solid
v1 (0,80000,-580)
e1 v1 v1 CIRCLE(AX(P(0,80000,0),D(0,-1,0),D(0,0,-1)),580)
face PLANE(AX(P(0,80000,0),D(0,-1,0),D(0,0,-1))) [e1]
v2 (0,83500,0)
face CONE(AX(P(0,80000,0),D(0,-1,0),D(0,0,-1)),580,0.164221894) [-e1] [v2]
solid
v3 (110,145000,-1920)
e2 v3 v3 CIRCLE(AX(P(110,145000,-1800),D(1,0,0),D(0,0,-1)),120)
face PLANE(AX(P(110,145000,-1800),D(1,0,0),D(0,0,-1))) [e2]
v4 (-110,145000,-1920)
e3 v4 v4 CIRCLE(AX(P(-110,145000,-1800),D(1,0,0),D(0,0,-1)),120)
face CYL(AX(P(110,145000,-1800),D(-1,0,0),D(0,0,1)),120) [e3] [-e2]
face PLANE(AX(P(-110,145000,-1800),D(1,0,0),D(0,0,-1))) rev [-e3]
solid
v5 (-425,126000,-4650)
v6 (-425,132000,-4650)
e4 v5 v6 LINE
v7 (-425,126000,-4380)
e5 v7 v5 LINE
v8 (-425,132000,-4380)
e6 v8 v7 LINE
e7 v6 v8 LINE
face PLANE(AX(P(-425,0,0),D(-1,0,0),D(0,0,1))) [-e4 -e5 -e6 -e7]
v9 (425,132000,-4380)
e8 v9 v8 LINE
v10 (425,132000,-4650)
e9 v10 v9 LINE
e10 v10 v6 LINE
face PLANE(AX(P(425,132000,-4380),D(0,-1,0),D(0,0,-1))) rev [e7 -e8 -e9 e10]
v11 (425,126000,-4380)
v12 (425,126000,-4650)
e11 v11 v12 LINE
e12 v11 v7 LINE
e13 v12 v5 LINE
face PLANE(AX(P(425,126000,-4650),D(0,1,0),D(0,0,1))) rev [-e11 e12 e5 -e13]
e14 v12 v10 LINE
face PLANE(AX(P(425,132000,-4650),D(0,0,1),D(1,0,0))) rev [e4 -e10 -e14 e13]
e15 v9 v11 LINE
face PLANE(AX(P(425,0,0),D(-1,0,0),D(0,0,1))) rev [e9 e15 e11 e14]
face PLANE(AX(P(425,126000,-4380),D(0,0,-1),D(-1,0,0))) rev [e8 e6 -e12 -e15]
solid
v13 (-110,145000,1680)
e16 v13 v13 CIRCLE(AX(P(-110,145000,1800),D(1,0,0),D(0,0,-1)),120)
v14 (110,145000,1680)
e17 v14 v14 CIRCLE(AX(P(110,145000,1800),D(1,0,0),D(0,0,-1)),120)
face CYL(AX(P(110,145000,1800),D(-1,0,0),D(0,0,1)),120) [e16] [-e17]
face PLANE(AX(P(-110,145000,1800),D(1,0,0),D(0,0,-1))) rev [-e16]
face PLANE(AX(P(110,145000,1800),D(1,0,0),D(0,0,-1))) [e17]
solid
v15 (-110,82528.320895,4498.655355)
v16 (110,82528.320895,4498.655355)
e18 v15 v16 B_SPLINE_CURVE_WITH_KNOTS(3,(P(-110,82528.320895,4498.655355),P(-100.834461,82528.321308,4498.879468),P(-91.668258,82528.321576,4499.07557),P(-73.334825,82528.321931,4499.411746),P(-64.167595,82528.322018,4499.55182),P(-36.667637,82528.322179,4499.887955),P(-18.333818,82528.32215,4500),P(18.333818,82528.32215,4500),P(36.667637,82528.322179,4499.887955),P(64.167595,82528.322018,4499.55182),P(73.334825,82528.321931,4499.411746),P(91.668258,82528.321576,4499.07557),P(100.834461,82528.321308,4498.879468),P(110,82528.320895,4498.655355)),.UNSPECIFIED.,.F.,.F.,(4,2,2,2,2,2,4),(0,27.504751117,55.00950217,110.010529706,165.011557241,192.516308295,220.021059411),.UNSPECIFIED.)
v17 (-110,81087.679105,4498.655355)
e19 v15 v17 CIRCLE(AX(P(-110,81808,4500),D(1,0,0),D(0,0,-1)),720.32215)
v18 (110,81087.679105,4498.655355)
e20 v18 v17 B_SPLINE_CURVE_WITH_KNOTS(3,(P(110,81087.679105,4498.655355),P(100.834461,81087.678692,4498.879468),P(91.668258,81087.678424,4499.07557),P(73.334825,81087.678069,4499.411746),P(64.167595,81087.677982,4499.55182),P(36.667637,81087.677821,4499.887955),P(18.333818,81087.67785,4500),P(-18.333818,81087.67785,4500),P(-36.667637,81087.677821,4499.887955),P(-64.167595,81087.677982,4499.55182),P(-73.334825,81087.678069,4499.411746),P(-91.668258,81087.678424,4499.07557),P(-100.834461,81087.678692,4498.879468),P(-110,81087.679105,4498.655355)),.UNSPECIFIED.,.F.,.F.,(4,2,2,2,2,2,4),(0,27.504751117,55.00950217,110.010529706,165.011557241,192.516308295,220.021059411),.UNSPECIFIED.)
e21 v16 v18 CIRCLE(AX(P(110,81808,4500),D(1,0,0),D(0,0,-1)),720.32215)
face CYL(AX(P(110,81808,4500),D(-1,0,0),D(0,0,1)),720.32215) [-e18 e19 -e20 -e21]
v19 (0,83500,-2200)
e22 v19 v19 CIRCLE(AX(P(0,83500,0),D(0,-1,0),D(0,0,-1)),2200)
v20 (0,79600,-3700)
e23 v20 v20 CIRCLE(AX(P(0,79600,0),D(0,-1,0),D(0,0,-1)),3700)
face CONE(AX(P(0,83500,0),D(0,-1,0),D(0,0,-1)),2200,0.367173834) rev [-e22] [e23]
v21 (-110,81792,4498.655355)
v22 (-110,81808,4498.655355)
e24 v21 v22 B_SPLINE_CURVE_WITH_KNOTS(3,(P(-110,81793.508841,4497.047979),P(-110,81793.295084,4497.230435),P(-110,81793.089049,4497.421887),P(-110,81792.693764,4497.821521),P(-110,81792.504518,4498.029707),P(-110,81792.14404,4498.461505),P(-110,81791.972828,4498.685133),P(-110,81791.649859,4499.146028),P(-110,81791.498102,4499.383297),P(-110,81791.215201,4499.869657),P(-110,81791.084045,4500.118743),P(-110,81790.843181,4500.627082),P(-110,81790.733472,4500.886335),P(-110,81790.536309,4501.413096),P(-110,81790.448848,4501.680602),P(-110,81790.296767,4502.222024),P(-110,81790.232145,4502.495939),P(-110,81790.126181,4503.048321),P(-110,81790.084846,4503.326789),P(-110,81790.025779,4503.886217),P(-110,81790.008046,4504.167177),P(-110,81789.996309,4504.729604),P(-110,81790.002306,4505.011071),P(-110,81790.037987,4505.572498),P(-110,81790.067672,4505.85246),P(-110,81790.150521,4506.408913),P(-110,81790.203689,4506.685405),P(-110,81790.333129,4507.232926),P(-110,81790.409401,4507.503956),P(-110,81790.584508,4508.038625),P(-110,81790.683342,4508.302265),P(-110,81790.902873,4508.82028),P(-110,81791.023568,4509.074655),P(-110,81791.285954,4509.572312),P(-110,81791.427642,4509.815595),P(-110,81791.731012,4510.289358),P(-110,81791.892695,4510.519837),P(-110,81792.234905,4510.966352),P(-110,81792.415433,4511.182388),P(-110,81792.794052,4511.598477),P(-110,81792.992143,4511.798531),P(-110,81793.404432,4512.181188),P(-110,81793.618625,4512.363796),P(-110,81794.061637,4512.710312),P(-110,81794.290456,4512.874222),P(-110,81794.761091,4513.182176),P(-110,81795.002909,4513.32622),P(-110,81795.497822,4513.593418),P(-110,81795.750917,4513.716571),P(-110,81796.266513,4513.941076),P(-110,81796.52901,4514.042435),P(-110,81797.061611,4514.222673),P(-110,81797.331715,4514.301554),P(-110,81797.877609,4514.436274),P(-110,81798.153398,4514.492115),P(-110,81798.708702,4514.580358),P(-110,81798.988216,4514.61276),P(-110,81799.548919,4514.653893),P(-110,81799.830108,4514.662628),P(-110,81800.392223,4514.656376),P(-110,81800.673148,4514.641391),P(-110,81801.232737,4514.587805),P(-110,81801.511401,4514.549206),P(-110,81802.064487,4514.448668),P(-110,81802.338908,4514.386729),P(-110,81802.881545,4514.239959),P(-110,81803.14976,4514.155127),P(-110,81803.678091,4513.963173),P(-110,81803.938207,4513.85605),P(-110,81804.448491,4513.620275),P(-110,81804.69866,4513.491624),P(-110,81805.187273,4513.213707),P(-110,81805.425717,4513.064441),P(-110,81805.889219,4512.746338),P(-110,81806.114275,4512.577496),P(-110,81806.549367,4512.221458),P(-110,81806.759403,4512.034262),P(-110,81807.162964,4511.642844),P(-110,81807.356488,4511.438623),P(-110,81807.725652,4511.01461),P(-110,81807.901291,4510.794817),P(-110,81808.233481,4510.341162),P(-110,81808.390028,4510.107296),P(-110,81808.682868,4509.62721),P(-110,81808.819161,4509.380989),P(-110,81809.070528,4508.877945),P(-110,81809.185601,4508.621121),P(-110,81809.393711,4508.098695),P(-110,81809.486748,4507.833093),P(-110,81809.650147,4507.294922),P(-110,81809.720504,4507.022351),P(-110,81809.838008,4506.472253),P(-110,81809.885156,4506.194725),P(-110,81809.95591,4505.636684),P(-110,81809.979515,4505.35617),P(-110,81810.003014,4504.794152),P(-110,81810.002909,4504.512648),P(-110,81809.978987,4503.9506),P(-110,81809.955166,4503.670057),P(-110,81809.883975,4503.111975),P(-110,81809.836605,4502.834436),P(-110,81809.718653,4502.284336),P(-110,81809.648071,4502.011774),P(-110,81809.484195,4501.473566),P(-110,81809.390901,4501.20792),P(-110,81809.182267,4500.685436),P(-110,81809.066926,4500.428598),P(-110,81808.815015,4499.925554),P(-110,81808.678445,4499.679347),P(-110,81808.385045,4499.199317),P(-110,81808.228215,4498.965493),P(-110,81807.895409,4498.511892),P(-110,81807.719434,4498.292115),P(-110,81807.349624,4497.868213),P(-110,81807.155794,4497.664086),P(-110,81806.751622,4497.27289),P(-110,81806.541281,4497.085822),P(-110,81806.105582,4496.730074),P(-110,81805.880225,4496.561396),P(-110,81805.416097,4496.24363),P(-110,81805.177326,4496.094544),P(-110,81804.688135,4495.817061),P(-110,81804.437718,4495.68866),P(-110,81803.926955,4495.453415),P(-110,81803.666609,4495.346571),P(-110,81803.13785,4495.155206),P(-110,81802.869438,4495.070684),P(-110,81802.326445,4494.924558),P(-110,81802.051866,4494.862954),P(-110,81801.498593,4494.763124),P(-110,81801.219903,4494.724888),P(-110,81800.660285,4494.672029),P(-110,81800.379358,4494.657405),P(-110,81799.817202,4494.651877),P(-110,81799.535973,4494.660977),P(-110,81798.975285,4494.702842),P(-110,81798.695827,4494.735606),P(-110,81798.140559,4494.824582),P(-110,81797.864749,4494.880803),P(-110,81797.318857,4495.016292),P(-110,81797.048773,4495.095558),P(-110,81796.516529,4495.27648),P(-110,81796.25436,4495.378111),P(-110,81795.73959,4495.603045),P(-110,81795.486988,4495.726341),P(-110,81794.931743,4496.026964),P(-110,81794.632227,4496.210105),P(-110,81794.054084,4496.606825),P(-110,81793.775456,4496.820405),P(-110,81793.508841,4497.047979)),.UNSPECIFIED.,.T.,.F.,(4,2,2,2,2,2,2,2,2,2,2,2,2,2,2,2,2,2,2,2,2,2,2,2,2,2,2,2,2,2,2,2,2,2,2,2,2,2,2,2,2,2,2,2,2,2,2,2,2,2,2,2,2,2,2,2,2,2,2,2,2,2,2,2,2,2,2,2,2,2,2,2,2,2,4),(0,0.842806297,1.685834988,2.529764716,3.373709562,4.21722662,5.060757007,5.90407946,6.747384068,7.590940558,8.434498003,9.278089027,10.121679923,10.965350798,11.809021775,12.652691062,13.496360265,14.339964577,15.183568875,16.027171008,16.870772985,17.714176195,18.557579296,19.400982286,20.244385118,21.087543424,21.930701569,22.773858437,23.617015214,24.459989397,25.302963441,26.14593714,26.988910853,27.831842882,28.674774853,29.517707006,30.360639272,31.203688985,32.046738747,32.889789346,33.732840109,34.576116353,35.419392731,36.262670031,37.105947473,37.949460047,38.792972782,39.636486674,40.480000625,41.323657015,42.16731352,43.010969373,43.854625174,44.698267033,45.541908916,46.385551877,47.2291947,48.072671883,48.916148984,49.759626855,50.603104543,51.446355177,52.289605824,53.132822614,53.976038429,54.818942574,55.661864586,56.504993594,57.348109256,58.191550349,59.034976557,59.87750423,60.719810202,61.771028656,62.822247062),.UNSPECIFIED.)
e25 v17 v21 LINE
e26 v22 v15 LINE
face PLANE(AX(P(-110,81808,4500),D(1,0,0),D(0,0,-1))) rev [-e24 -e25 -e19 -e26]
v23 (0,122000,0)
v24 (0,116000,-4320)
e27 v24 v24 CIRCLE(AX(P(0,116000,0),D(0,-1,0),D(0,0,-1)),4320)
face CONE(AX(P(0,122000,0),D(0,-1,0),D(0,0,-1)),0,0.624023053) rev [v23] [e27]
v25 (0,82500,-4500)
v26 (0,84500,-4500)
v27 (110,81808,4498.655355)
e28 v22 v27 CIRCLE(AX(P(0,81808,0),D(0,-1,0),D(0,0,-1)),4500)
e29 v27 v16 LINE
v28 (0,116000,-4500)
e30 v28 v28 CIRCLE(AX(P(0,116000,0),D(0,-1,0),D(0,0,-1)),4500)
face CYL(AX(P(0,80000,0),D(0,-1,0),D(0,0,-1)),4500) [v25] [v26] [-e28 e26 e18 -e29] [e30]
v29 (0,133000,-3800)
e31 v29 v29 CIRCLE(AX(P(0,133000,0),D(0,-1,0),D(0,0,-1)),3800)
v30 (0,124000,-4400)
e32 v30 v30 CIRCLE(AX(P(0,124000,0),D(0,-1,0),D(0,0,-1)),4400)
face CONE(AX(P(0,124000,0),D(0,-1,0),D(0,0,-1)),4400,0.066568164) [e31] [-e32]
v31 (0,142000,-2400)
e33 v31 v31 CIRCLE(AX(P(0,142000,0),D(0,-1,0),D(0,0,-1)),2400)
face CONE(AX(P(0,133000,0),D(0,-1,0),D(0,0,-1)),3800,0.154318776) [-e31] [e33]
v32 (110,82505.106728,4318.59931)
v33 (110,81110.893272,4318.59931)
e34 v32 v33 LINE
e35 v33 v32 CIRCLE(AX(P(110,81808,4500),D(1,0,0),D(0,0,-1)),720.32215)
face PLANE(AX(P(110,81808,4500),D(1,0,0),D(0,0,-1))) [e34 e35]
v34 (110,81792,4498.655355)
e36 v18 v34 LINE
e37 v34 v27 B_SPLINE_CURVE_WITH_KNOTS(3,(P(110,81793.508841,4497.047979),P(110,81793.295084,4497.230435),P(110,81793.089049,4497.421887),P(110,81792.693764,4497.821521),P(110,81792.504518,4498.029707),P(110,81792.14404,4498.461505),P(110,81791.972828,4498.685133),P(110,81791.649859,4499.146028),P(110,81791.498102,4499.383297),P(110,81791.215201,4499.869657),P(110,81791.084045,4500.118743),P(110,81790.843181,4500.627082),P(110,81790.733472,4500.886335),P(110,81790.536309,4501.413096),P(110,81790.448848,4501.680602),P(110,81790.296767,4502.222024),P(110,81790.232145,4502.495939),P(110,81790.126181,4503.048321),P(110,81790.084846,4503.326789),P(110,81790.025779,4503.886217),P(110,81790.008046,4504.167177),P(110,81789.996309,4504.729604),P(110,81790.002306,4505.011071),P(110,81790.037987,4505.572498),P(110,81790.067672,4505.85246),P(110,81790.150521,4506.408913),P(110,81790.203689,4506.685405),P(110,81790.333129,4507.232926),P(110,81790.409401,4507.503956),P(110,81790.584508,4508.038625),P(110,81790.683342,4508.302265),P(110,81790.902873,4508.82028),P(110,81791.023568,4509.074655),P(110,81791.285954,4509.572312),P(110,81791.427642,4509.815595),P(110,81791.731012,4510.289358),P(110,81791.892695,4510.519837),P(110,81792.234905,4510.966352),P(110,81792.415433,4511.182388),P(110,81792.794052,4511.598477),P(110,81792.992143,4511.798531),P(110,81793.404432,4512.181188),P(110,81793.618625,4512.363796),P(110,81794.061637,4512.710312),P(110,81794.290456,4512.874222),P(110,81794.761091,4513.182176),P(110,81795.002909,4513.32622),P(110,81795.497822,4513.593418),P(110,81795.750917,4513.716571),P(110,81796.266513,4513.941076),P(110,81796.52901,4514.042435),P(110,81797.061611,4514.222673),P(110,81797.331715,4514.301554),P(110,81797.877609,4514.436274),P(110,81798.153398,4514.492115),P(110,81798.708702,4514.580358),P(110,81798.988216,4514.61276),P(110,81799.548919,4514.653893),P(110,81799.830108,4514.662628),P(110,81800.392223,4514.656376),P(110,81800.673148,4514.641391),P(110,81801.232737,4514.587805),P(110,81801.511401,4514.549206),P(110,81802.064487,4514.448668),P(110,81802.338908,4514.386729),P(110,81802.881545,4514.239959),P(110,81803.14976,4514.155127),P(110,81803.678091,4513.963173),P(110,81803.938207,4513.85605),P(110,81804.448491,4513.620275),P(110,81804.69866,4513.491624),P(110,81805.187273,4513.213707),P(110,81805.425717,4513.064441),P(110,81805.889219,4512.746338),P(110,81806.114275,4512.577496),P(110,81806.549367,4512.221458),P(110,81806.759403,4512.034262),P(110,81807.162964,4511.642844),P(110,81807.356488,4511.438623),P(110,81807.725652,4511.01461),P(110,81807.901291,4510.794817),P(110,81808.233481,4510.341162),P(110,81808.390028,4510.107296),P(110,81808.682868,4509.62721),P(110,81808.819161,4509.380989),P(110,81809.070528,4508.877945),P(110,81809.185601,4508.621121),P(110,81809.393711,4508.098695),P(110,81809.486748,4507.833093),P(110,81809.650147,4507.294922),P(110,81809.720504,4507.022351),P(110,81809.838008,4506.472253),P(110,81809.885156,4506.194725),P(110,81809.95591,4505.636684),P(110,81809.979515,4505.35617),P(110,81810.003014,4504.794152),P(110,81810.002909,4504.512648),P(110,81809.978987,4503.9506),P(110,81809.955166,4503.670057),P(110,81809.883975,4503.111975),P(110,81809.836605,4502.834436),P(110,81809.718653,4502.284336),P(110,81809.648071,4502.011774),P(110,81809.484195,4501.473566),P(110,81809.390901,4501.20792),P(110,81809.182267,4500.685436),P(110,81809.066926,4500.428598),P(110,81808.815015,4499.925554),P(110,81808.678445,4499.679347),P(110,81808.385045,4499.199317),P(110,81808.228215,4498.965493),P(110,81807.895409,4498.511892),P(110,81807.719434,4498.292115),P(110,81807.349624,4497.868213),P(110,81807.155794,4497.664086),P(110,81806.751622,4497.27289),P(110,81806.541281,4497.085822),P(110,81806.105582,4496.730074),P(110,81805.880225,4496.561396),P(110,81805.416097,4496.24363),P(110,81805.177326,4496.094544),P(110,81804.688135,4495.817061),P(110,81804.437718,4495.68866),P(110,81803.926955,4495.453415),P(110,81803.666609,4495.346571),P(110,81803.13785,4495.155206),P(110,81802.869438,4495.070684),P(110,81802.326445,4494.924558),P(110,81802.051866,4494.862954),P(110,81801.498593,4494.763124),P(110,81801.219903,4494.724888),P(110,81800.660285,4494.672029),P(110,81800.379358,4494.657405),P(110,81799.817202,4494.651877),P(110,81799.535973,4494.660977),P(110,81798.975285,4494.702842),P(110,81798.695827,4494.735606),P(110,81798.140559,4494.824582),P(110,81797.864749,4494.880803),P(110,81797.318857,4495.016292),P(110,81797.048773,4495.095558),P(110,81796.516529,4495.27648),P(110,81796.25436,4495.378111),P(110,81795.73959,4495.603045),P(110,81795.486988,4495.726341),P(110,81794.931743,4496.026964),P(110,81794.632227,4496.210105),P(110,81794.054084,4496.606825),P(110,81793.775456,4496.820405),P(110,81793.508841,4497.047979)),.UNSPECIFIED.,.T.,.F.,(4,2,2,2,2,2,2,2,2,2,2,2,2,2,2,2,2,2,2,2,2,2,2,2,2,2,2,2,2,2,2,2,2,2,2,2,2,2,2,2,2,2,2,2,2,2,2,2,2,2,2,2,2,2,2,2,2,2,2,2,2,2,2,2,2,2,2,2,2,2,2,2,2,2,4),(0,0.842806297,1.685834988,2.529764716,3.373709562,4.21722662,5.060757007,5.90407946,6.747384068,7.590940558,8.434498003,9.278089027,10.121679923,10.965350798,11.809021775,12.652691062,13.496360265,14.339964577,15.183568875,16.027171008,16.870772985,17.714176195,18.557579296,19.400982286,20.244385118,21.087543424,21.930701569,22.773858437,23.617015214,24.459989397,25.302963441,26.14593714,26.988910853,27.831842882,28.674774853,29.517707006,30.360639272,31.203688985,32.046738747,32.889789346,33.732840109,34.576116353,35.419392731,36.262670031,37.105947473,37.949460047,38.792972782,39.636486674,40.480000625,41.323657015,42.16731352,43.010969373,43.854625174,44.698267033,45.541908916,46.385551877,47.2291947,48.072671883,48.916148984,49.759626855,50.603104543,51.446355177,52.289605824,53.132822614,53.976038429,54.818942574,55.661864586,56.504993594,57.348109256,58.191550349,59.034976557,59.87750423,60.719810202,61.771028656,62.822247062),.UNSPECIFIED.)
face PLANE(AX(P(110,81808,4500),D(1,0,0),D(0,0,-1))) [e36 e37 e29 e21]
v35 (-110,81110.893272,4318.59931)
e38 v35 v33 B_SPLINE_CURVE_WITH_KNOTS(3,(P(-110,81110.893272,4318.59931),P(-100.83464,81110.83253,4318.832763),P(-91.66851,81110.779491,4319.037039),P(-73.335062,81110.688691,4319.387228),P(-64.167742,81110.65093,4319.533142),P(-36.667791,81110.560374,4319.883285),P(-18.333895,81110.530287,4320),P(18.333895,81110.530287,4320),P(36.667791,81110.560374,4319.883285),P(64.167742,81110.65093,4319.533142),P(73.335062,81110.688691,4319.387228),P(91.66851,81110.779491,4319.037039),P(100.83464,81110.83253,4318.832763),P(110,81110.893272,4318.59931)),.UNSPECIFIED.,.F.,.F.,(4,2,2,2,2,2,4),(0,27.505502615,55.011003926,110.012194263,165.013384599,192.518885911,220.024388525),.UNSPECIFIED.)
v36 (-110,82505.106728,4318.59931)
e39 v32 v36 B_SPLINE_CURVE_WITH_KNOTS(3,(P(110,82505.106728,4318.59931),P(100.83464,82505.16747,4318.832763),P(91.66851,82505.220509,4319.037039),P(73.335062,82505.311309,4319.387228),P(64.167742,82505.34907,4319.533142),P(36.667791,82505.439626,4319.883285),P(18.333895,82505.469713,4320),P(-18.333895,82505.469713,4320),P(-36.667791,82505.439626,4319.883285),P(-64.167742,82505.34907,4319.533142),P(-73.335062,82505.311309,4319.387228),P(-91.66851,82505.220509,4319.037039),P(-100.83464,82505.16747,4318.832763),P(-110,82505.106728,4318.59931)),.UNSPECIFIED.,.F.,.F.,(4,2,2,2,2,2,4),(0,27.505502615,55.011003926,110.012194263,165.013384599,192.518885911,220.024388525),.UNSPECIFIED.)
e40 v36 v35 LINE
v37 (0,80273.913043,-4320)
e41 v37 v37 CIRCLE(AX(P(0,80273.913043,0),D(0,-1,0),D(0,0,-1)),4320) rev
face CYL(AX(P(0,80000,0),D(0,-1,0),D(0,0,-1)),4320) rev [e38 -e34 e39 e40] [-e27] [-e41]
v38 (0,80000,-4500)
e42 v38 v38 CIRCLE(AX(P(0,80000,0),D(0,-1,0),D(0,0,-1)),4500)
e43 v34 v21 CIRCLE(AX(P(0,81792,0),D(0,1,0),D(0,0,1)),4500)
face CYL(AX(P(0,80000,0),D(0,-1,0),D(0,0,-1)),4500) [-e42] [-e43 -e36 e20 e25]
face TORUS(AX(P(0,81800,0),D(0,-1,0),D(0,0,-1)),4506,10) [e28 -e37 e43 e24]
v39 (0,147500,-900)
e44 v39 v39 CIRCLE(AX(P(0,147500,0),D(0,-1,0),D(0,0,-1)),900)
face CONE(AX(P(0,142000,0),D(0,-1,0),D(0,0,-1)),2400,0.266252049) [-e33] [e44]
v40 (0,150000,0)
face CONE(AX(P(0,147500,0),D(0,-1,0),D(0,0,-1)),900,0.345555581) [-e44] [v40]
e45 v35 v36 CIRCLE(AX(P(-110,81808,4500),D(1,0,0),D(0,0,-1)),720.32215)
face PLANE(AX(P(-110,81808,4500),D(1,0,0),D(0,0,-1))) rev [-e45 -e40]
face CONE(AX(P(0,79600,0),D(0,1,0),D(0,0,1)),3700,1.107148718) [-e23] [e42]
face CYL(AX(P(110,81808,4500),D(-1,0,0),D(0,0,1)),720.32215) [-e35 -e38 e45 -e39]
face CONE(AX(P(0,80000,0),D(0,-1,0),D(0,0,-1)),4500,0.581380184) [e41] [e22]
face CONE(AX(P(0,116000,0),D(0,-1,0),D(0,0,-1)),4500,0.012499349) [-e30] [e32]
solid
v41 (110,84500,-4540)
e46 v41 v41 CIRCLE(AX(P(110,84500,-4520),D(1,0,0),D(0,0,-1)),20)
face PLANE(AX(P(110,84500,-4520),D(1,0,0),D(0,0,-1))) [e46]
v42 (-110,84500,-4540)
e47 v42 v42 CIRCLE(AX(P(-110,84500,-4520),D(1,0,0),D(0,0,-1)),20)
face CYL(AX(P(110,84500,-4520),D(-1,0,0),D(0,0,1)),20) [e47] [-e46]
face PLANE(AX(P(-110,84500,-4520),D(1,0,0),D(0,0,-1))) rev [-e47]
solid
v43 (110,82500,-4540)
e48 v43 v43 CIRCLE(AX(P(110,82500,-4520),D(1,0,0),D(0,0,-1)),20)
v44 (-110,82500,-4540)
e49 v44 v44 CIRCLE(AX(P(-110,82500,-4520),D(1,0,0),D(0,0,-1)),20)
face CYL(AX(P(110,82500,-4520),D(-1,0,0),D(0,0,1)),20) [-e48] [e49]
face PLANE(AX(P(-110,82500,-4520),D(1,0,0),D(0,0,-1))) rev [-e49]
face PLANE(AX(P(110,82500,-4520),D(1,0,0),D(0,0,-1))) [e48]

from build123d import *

# Parameters (mm, degrees)
SKETCH2_R                 = 10
BOSS_EXTRUDE4_START       = -110
BOSS_EXTRUDE4_OUTLINE_R   = 120
BOSS_EXTRUDE4_DEPTH       = 220
BOSS_EXTRUDE4_2_OUTLINE_R = 120
BOSS_EXTRUDE4_2_DEPTH     = 220
BOSS_EXTRUDE4_3_OUTLINE_R = 20
BOSS_EXTRUDE4_3_DEPTH     = 220
BOSS_EXTRUDE4_4_OUTLINE_R = 20
BOSS_EXTRUDE4_4_DEPTH     = 220
SKETCH7_W                 = 270
SKETCH7_H                 = 6000
BOSS_EXTRUDE5_DEPTH       = 425


with BuildPart() as part:
    # Sketch1 → Revolve1 (revolve)
    with BuildSketch(Plane.XY, mode=Mode.PRIVATE) as revolve1_sk:
        Polygon((0, 150000), (900, 147500), (2400, 142000), (3800, 133000), (4400, 124000), (4500, 116000), (4500, 80000), (4320, 80000), (4320, 116000), (0, 122000), align=None)
    revolve(revolve1_sk.sketch.rotate(Axis((0, 80000, 0), (0, 1, 0)), 90), axis=Axis((0, 80000, 0), (0, 1, 0)))

    # Sketch2 → Revolve2 (revolve)
    with BuildSketch(Plane.XY, mode=Mode.PRIVATE) as revolve2_sk:
        with Locations((4506, 81800)):
            Circle(SKETCH2_R)
    revolve(revolve2_sk.sketch.rotate(Axis((0, 80000, 0), (0, 1, 0)), 90), axis=Axis((0, 80000, 0), (0, 1, 0)))

    # Sketch4 → Revolve3 (revolve)
    with BuildSketch(Plane.XY, mode=Mode.PRIVATE) as revolve3_sk:
        Polygon((0, 83500), (0, 80000), (580, 80000), align=None)
        Polygon((2200, 83500), (4500, 80000), (3700, 79600), align=None)
    revolve(revolve3_sk.sketch.rotate(Axis((0, 78000, 0), (0, 1, 0)), 90), axis=Axis((0, 78000, 0), (0, 1, 0)))


with BuildPart() as revolve3_piece_1:
    # of the separate pieces the step leaves, piece 1, a body of its own (revolve3_pieces)
    add(part.part.solids().sort_by_distance((0, 150000, 0))[0])

    # Boss-Extrude4 5: loft between two sections, ruled curve by curve
    boss_extrude4_5_from = [
        Edge.make_three_point_arc((110, 82505.469961567, 4320.000964692), (110, 81808, 3779.677849848), (110, 81110.530038433, 4320.000964692)),
        Edge.make_line((110, 81110.530038433, 4320.000964692), (110, 82505.469961567, 4320.000964692)),
    ]
    boss_extrude4_5_to = [
        Edge.make_three_point_arc((-110, 82505.469961567, 4320.000964692), (-110, 81808, 3779.677849848), (-110, 81110.530038433, 4320.000964692)),
        Edge.make_line((-110, 81110.530038433, 4320.000964692), (-110, 82505.469961567, 4320.000964692)),
    ]
    boss_extrude4_5 = Solid(Shell([*[Face.make_surface_from_curves(boss_extrude4_5_from[k], boss_extrude4_5_to[k]) for k in range(2)], Face(Wire(boss_extrude4_5_from)), Face(Wire(boss_extrude4_5_to))]))
    add(boss_extrude4_5)

    # Boss-Extrude4 6: loft between two sections, ruled curve by curve
    boss_extrude4_6_from = [
        Edge.make_three_point_arc((110, 81087.679104892, 4498.655354659), (110, 81298.180140724, 5008.869051022), (110, 81808, 5220.322150152)),
        Edge.make_three_point_arc((110, 81808, 5220.322150152), (110, 82317.819859276, 5008.869051022), (110, 82528.320895108, 4498.655354659)),
        Edge.make_line((110, 82528.320895108, 4498.655354659), (110, 81087.679104892, 4498.655354659)),
    ]
    boss_extrude4_6_to = [
        Edge.make_three_point_arc((-110, 81087.679104892, 4498.655354659), (-110, 81298.180140724, 5008.869051022), (-110, 81808, 5220.322150152)),
        Edge.make_three_point_arc((-110, 81808, 5220.322150152), (-110, 82317.819859276, 5008.869051022), (-110, 82528.320895108, 4498.655354659)),
        Edge.make_line((-110, 82528.320895108, 4498.655354659), (-110, 81087.679104892, 4498.655354659)),
    ]
    boss_extrude4_6 = Solid(Shell([*[Face.make_surface_from_curves(boss_extrude4_6_from[k], boss_extrude4_6_to[k]) for k in range(3)], Face(Wire(boss_extrude4_6_from)), Face(Wire(boss_extrude4_6_to))]))
    add(boss_extrude4_6)


with BuildPart() as revolve3_piece_2:
    # of the separate pieces the step leaves, piece 2, a body of its own (revolve3_pieces)
    add(part.part.solids().sort_by_distance((0, 80000, -580))[0])


with BuildPart() as body_3:
    # Boss-Extrude4: read off the stored shape, not the designer's step
    # Boss-Extrude4 outline → Boss-Extrude4 (new body)
    with BuildSketch(Plane(origin=(0, 0, 0), x_dir=(0, 0, -1), z_dir=(1, 0, 0)).offset(BOSS_EXTRUDE4_START)):
        with Locations((-1800, 145000)):
            Circle(BOSS_EXTRUDE4_OUTLINE_R)
    extrude(amount=BOSS_EXTRUDE4_DEPTH)


with BuildPart() as body_4:
    # Boss-Extrude4 2 outline → Boss-Extrude4 2 (new body)
    with BuildSketch(Plane(origin=(0, 0, 0), x_dir=(0, 0, -1), z_dir=(1, 0, 0)).offset(BOSS_EXTRUDE4_START)):
        with Locations((1800, 145000)):
            Circle(BOSS_EXTRUDE4_2_OUTLINE_R)
    extrude(amount=BOSS_EXTRUDE4_2_DEPTH)


with BuildPart() as body_5:
    # Boss-Extrude4 3 outline → Boss-Extrude4 3 (new body)
    with BuildSketch(Plane(origin=(0, 0, 0), x_dir=(0, 0, -1), z_dir=(1, 0, 0)).offset(BOSS_EXTRUDE4_START)):
        with Locations((4520, 84500)):
            Circle(BOSS_EXTRUDE4_3_OUTLINE_R)
    extrude(amount=BOSS_EXTRUDE4_3_DEPTH)


with BuildPart() as body_6:
    # Boss-Extrude4 4 outline → Boss-Extrude4 4 (new body)
    with BuildSketch(Plane(origin=(0, 0, 0), x_dir=(0, 0, -1), z_dir=(1, 0, 0)).offset(BOSS_EXTRUDE4_START)):
        with Locations((4520, 82500)):
            Circle(BOSS_EXTRUDE4_4_OUTLINE_R)
    extrude(amount=BOSS_EXTRUDE4_4_DEPTH)


with BuildPart() as body_7:
    # Sketch7 → Boss-Extrude5 (new, symmetric)
    with BuildSketch(Plane(origin=(0, 0, 0), x_dir=(0, 0, -1), z_dir=(1, 0, 0))):
        with Locations((4515, 129000)):
            Rectangle(SKETCH7_W, SKETCH7_H)
    extrude(amount=BOSS_EXTRUDE5_DEPTH, both=True)


solid = Compound([revolve3_piece_1.part, revolve3_piece_2.part, body_3.part, body_4.part, body_5.part, body_6.part, body_7.part])
